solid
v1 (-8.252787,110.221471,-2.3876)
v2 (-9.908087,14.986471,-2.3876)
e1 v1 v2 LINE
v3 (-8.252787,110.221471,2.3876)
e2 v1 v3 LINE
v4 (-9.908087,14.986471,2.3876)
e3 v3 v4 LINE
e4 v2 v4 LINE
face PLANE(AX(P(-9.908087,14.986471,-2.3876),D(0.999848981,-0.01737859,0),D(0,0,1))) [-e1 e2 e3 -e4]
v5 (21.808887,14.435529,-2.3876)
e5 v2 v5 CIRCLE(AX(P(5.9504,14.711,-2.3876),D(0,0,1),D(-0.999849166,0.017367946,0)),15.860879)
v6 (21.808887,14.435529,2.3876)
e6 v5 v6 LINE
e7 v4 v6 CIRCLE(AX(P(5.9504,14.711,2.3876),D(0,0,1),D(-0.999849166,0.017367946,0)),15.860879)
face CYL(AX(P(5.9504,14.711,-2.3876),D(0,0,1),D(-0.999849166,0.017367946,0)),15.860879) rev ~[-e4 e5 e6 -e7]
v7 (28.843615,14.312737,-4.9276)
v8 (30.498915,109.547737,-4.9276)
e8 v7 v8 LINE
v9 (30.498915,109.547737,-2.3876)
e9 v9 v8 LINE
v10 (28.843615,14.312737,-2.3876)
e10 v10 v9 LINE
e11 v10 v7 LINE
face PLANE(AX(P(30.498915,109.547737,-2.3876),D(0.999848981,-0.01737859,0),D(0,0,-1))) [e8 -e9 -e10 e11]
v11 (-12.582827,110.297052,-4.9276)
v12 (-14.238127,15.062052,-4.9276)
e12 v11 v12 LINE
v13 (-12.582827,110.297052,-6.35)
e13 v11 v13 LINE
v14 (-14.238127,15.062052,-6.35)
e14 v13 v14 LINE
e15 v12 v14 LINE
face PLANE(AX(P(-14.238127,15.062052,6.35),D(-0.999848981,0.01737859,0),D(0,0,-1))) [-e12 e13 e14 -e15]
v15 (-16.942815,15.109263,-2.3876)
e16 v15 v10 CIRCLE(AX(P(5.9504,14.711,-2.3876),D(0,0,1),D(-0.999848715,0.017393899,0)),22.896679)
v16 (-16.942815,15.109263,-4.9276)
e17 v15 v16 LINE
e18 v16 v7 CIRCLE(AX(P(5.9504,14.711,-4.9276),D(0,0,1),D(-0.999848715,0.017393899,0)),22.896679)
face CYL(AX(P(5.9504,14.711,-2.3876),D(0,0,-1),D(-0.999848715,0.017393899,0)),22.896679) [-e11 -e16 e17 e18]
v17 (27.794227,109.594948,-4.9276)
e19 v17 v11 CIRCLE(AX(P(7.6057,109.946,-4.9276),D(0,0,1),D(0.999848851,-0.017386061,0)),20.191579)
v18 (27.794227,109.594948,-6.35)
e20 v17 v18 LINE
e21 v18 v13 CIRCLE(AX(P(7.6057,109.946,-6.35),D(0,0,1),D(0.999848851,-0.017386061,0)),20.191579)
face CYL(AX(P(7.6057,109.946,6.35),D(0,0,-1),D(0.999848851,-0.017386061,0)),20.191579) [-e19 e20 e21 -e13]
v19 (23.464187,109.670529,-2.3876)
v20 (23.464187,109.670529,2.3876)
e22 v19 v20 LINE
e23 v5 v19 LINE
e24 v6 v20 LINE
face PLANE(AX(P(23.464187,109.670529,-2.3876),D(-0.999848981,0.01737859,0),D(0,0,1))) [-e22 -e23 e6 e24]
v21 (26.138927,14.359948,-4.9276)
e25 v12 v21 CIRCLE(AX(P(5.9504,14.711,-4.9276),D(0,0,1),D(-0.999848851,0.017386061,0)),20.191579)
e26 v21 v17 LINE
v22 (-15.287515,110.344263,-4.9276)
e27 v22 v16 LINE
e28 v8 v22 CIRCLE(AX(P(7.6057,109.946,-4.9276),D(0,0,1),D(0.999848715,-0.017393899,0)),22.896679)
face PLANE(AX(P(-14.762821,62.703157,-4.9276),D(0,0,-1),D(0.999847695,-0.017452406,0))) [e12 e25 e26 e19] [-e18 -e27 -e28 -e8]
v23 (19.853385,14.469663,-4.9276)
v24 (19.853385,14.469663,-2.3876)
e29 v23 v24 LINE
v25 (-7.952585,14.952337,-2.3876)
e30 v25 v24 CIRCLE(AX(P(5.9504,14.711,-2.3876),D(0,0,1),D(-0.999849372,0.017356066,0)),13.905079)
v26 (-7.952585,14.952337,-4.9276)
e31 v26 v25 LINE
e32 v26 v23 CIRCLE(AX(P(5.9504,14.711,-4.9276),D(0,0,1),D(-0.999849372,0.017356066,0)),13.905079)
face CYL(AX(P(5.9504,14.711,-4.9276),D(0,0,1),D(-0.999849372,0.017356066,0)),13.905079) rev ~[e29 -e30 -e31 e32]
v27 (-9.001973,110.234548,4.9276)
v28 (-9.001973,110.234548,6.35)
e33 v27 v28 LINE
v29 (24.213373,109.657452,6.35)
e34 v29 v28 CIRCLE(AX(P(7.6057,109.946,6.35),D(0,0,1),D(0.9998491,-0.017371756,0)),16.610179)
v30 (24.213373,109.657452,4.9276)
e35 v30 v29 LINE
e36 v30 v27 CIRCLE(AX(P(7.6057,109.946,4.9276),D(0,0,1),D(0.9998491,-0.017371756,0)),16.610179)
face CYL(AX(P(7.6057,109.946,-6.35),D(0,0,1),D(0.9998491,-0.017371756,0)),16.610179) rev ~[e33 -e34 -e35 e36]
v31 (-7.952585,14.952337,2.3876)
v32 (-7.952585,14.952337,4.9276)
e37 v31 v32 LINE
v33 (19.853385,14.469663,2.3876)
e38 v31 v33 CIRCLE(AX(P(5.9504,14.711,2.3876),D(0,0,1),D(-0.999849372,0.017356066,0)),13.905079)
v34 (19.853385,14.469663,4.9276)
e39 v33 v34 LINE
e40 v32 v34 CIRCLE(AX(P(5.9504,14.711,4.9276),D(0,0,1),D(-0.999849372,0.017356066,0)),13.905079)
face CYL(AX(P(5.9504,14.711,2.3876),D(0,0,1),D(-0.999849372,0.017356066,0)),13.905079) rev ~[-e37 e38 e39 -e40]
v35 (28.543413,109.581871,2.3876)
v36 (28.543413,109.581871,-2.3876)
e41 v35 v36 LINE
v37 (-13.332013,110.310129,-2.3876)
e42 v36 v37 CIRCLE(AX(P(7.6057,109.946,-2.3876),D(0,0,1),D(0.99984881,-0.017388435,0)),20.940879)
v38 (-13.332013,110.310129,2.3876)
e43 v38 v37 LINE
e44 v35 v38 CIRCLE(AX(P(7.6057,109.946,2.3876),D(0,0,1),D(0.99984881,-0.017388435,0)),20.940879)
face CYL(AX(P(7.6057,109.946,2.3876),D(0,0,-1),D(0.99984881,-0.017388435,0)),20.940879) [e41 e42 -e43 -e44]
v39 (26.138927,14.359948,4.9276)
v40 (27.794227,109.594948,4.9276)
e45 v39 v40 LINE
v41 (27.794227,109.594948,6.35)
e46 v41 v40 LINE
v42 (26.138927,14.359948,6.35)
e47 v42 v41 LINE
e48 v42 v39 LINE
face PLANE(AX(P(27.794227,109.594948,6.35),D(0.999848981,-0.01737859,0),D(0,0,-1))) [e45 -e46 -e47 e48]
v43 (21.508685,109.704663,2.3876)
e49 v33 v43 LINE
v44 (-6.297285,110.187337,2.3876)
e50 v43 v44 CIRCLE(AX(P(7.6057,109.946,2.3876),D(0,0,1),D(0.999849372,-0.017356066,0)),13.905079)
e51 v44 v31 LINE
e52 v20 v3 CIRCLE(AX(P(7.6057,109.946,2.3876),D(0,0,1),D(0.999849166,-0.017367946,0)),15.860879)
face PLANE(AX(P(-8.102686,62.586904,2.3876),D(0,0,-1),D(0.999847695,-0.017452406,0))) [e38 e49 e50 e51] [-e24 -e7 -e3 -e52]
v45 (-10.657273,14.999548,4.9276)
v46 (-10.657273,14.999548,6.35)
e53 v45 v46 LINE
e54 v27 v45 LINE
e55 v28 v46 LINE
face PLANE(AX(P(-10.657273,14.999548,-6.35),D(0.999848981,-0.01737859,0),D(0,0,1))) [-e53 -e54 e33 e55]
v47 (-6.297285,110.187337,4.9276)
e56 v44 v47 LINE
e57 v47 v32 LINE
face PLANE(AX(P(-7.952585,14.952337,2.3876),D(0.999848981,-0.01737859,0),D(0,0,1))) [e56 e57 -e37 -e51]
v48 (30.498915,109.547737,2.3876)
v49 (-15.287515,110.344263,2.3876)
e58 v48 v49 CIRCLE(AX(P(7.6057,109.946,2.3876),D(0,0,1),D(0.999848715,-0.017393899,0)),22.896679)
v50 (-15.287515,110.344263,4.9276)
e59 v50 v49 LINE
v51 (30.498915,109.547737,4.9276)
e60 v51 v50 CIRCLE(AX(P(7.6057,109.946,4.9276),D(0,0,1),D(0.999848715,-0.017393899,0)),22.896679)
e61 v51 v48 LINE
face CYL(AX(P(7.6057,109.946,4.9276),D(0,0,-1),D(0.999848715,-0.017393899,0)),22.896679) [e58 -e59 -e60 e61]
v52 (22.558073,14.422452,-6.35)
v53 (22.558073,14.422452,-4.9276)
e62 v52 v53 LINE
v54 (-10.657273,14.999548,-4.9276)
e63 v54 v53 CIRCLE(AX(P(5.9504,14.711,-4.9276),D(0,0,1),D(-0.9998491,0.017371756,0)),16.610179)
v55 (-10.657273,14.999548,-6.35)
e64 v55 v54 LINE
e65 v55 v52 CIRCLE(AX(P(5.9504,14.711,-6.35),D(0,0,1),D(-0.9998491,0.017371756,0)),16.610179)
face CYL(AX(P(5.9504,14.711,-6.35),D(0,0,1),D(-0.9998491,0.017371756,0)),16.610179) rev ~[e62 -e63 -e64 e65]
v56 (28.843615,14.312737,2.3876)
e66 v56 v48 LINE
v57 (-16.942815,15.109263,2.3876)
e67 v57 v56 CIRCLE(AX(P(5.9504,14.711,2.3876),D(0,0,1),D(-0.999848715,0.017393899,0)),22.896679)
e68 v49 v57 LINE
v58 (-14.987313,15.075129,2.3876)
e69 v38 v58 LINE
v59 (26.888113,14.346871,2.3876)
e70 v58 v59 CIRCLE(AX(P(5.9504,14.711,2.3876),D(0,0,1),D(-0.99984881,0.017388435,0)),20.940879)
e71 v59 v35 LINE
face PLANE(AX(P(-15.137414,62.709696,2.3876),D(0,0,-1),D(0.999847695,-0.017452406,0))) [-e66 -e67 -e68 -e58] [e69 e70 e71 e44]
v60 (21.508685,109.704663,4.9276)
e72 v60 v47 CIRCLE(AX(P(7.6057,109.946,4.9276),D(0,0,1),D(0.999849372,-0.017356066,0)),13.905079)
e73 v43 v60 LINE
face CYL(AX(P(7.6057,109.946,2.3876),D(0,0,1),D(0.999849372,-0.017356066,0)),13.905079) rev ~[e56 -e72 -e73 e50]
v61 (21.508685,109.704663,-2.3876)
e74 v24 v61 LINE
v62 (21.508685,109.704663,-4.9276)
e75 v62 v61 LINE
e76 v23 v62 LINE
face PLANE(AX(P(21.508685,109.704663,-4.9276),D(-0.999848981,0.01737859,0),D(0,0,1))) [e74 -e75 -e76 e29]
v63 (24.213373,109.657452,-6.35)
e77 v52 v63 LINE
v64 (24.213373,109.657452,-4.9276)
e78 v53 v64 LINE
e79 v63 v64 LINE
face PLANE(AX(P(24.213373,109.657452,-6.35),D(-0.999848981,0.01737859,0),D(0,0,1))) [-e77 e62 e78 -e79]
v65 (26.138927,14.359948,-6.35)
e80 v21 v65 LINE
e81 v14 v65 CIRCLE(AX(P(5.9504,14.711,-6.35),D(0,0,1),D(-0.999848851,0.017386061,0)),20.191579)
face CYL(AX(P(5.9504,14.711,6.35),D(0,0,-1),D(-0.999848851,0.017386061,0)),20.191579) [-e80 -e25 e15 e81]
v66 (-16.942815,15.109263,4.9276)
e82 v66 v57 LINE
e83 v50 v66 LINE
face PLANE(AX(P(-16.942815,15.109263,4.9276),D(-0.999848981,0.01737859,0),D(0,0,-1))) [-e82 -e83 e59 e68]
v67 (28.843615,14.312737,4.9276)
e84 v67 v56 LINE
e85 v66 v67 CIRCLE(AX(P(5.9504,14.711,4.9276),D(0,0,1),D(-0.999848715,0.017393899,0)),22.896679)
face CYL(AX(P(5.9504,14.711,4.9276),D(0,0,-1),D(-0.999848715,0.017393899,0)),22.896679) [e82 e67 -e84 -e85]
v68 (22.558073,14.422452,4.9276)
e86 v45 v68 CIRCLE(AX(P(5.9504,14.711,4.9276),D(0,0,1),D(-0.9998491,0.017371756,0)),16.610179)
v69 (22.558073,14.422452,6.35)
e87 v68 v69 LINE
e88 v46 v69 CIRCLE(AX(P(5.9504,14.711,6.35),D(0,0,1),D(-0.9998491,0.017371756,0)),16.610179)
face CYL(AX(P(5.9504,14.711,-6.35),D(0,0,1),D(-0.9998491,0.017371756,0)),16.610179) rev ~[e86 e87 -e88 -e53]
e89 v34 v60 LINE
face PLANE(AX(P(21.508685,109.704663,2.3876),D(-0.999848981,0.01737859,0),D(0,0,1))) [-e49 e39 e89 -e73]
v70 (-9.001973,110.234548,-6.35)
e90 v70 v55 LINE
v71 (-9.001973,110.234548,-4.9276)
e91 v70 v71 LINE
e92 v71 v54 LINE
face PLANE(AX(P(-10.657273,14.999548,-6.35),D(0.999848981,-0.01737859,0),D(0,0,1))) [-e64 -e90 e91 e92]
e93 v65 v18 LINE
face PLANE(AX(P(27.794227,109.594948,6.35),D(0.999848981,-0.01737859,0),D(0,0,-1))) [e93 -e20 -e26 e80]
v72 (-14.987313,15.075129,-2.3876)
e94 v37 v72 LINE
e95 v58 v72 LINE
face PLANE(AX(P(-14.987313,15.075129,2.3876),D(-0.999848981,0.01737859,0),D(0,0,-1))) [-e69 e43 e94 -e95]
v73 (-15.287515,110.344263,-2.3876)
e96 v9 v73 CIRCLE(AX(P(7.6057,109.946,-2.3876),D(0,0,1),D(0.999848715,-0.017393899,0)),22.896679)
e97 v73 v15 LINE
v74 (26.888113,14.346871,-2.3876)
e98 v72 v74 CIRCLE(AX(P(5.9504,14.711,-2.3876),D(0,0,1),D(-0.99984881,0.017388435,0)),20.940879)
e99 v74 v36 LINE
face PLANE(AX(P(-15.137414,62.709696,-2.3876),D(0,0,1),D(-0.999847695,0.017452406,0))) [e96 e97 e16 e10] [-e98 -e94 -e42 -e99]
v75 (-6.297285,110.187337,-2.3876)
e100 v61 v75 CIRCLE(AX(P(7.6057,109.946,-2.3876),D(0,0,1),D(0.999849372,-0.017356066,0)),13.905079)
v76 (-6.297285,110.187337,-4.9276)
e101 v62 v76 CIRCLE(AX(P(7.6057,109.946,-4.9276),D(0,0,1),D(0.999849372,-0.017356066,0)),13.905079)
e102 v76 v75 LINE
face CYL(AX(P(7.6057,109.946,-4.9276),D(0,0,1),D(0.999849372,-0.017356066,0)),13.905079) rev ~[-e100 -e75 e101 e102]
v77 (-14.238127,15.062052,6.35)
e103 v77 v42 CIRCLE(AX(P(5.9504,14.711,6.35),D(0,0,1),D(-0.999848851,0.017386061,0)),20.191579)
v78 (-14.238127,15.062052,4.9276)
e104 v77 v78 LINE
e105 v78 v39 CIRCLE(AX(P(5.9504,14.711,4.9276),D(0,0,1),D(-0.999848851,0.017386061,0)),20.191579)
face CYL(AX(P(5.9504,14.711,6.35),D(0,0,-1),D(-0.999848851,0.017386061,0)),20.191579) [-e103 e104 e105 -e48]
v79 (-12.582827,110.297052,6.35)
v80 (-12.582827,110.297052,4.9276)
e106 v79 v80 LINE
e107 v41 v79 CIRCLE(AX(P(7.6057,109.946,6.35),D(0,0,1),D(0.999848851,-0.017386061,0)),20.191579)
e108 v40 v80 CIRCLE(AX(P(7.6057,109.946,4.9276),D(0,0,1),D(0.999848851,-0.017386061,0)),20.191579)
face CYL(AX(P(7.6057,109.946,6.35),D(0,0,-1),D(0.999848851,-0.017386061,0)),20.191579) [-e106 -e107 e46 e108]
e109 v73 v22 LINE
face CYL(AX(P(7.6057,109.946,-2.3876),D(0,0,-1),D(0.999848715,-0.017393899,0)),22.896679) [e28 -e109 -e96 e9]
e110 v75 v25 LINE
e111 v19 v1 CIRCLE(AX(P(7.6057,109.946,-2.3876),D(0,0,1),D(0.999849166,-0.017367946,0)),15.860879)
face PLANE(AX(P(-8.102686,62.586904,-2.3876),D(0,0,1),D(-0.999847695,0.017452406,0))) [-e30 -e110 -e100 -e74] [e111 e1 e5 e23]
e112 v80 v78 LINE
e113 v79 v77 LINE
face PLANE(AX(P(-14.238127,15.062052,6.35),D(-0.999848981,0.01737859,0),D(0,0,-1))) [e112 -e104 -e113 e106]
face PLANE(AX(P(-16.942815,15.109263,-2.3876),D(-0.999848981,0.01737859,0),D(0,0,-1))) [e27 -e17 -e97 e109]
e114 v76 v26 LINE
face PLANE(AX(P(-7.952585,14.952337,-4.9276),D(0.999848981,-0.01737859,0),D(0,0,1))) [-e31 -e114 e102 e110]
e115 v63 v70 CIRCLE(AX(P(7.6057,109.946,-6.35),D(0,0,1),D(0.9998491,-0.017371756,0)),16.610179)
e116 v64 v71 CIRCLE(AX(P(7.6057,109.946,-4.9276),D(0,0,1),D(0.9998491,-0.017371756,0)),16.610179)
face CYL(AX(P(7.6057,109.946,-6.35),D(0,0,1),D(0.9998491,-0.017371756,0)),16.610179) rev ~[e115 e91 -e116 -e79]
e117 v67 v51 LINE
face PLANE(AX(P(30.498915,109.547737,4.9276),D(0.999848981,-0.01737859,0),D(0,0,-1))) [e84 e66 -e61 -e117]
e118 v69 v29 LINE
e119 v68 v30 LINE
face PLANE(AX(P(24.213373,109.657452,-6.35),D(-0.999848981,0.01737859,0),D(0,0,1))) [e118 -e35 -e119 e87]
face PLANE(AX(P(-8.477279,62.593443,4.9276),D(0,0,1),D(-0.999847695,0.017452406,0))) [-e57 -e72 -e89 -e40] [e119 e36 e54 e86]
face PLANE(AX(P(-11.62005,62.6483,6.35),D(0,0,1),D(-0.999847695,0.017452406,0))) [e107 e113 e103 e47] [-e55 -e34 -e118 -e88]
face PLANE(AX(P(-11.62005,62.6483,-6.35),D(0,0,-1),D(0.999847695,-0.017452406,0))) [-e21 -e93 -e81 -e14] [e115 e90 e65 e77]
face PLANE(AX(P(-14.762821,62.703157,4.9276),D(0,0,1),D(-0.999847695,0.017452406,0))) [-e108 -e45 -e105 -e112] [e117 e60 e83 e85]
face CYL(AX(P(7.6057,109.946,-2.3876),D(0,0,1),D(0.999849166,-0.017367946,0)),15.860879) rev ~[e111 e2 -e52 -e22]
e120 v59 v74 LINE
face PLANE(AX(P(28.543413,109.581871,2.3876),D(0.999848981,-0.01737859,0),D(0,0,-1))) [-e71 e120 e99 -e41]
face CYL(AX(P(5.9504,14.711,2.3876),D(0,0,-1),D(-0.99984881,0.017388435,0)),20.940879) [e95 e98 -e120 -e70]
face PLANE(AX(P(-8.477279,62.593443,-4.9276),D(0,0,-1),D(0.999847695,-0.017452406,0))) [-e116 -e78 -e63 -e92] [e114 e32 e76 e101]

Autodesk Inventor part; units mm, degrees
ref_plane "Work Plane2" through (5.9504, 14.711, 0) normal (-1, 0, 0) x (0, 0, 1)
ref_plane "Work Plane3" through (7.6057, 109.946, 0) normal (-0.5, -0.8660254, 0) x (0, 0, 1)
sketch "Path" plane through (0, 0, 0) normal (0, 0, 1) x (1, 0, 0)
  arc A0 (-12.4477, 15.0308) -> (24.3485, 14.3912) centre (5.9504, 14.711) ccw
  arc A1 (26.0038, 109.6262) -> (-10.7924, 110.2658) centre (7.6057, 109.946) ccw
  line L0 (26.0038, 109.6262) -> (24.3485, 14.3912)
  line L1 (-12.4477, 15.0308) -> (-10.7924, 110.2658)
  dimension "d31" = 8.9916
ref_plane "Section Plane" through (24.3485, 14.3912, 0) normal (0.0173792, 0.999849, 0) x (0, 0, 1)
sketch "Section Sketch" plane through (24.3485, 14.3912, 0) normal (0.0173792, 0.999849, 0) x (0, 0, 1)
  line L0 (-6.35, -1.7907) -> (6.35, -1.7907)
  line L1 (6.35, -1.7907) -> (6.35, 1.7907)
  line L2 (6.35, 1.7907) -> (-6.35, 1.7907)
  line L3 (-6.35, 1.7907) -> (-6.35, -1.7907)
  line L4 (-2.3876, -2.54) -> (2.3876, -2.54)
  line L5 (2.3876, -2.54) -> (2.3876, 2.54)
  line L6 (2.3876, 2.54) -> (-2.3876, 2.54)
  line L7 (-2.3876, 2.54) -> (-2.3876, -2.54)
  line L8 (-2.3876, 0) -> (2.3876, 0) construction
  line L9 (-4.9276, -4.4958) -> (-2.3876, -4.4958)
  line L10 (-2.3876, -4.4958) -> (-2.3876, 4.4958)
  line L11 (-2.3876, 4.4958) -> (-4.9276, 4.4958)
  line L12 (-4.9276, 4.4958) -> (-4.9276, -4.4958)
  line L13 (2.3876, -4.4958) -> (4.9276, -4.4958)
  line L14 (4.9276, -4.4958) -> (4.9276, 4.4958)
  line L15 (4.9276, 4.4958) -> (2.3876, 4.4958)
  line L16 (2.3876, 4.4958) -> (2.3876, -4.4958)
  line L17 (-6.35, 0) -> (6.35, 0) construction
  point P0 (0, 0)
  point P1 (0, 0)
  dimension "d21" = 3.5814
  dimension "d22" = 5.08
  dimension "d23" = 4.7752
  dimension "d24" = 2.54
  dimension "d31" = 8.9916
  dimension "d32" = 12.7
sweep "Solid" add profiles "Section Sketch" path "Path"
pattern_of_one "Strand Pattern"
equation "\"d21\" = da_d2"
equation "\"d22\" = da_d1"
equation "\"d23\" = da_b1"
equation "\"d24\" = da_t1 + da_t2"
equation "\"d30\" = da_pt"
equation "\"da_p\" = 9.525"
equation "\"da_b1\" = 4.7752"
equation "\"da_h2\" = 8.9916"
equation "\"da_h3\" = 7.7978"
equation "\"da_d1\" = 5.08"
equation "\"da_d2\" = 3.5814"
equation "\"da_pt\" = 10.1346"
equation "\"da_b\" = 12.7"
equation "\"da_t1\" = 1.27"
equation "\"da_t2\" = 1.27"
properties part number "Roller Chain"
